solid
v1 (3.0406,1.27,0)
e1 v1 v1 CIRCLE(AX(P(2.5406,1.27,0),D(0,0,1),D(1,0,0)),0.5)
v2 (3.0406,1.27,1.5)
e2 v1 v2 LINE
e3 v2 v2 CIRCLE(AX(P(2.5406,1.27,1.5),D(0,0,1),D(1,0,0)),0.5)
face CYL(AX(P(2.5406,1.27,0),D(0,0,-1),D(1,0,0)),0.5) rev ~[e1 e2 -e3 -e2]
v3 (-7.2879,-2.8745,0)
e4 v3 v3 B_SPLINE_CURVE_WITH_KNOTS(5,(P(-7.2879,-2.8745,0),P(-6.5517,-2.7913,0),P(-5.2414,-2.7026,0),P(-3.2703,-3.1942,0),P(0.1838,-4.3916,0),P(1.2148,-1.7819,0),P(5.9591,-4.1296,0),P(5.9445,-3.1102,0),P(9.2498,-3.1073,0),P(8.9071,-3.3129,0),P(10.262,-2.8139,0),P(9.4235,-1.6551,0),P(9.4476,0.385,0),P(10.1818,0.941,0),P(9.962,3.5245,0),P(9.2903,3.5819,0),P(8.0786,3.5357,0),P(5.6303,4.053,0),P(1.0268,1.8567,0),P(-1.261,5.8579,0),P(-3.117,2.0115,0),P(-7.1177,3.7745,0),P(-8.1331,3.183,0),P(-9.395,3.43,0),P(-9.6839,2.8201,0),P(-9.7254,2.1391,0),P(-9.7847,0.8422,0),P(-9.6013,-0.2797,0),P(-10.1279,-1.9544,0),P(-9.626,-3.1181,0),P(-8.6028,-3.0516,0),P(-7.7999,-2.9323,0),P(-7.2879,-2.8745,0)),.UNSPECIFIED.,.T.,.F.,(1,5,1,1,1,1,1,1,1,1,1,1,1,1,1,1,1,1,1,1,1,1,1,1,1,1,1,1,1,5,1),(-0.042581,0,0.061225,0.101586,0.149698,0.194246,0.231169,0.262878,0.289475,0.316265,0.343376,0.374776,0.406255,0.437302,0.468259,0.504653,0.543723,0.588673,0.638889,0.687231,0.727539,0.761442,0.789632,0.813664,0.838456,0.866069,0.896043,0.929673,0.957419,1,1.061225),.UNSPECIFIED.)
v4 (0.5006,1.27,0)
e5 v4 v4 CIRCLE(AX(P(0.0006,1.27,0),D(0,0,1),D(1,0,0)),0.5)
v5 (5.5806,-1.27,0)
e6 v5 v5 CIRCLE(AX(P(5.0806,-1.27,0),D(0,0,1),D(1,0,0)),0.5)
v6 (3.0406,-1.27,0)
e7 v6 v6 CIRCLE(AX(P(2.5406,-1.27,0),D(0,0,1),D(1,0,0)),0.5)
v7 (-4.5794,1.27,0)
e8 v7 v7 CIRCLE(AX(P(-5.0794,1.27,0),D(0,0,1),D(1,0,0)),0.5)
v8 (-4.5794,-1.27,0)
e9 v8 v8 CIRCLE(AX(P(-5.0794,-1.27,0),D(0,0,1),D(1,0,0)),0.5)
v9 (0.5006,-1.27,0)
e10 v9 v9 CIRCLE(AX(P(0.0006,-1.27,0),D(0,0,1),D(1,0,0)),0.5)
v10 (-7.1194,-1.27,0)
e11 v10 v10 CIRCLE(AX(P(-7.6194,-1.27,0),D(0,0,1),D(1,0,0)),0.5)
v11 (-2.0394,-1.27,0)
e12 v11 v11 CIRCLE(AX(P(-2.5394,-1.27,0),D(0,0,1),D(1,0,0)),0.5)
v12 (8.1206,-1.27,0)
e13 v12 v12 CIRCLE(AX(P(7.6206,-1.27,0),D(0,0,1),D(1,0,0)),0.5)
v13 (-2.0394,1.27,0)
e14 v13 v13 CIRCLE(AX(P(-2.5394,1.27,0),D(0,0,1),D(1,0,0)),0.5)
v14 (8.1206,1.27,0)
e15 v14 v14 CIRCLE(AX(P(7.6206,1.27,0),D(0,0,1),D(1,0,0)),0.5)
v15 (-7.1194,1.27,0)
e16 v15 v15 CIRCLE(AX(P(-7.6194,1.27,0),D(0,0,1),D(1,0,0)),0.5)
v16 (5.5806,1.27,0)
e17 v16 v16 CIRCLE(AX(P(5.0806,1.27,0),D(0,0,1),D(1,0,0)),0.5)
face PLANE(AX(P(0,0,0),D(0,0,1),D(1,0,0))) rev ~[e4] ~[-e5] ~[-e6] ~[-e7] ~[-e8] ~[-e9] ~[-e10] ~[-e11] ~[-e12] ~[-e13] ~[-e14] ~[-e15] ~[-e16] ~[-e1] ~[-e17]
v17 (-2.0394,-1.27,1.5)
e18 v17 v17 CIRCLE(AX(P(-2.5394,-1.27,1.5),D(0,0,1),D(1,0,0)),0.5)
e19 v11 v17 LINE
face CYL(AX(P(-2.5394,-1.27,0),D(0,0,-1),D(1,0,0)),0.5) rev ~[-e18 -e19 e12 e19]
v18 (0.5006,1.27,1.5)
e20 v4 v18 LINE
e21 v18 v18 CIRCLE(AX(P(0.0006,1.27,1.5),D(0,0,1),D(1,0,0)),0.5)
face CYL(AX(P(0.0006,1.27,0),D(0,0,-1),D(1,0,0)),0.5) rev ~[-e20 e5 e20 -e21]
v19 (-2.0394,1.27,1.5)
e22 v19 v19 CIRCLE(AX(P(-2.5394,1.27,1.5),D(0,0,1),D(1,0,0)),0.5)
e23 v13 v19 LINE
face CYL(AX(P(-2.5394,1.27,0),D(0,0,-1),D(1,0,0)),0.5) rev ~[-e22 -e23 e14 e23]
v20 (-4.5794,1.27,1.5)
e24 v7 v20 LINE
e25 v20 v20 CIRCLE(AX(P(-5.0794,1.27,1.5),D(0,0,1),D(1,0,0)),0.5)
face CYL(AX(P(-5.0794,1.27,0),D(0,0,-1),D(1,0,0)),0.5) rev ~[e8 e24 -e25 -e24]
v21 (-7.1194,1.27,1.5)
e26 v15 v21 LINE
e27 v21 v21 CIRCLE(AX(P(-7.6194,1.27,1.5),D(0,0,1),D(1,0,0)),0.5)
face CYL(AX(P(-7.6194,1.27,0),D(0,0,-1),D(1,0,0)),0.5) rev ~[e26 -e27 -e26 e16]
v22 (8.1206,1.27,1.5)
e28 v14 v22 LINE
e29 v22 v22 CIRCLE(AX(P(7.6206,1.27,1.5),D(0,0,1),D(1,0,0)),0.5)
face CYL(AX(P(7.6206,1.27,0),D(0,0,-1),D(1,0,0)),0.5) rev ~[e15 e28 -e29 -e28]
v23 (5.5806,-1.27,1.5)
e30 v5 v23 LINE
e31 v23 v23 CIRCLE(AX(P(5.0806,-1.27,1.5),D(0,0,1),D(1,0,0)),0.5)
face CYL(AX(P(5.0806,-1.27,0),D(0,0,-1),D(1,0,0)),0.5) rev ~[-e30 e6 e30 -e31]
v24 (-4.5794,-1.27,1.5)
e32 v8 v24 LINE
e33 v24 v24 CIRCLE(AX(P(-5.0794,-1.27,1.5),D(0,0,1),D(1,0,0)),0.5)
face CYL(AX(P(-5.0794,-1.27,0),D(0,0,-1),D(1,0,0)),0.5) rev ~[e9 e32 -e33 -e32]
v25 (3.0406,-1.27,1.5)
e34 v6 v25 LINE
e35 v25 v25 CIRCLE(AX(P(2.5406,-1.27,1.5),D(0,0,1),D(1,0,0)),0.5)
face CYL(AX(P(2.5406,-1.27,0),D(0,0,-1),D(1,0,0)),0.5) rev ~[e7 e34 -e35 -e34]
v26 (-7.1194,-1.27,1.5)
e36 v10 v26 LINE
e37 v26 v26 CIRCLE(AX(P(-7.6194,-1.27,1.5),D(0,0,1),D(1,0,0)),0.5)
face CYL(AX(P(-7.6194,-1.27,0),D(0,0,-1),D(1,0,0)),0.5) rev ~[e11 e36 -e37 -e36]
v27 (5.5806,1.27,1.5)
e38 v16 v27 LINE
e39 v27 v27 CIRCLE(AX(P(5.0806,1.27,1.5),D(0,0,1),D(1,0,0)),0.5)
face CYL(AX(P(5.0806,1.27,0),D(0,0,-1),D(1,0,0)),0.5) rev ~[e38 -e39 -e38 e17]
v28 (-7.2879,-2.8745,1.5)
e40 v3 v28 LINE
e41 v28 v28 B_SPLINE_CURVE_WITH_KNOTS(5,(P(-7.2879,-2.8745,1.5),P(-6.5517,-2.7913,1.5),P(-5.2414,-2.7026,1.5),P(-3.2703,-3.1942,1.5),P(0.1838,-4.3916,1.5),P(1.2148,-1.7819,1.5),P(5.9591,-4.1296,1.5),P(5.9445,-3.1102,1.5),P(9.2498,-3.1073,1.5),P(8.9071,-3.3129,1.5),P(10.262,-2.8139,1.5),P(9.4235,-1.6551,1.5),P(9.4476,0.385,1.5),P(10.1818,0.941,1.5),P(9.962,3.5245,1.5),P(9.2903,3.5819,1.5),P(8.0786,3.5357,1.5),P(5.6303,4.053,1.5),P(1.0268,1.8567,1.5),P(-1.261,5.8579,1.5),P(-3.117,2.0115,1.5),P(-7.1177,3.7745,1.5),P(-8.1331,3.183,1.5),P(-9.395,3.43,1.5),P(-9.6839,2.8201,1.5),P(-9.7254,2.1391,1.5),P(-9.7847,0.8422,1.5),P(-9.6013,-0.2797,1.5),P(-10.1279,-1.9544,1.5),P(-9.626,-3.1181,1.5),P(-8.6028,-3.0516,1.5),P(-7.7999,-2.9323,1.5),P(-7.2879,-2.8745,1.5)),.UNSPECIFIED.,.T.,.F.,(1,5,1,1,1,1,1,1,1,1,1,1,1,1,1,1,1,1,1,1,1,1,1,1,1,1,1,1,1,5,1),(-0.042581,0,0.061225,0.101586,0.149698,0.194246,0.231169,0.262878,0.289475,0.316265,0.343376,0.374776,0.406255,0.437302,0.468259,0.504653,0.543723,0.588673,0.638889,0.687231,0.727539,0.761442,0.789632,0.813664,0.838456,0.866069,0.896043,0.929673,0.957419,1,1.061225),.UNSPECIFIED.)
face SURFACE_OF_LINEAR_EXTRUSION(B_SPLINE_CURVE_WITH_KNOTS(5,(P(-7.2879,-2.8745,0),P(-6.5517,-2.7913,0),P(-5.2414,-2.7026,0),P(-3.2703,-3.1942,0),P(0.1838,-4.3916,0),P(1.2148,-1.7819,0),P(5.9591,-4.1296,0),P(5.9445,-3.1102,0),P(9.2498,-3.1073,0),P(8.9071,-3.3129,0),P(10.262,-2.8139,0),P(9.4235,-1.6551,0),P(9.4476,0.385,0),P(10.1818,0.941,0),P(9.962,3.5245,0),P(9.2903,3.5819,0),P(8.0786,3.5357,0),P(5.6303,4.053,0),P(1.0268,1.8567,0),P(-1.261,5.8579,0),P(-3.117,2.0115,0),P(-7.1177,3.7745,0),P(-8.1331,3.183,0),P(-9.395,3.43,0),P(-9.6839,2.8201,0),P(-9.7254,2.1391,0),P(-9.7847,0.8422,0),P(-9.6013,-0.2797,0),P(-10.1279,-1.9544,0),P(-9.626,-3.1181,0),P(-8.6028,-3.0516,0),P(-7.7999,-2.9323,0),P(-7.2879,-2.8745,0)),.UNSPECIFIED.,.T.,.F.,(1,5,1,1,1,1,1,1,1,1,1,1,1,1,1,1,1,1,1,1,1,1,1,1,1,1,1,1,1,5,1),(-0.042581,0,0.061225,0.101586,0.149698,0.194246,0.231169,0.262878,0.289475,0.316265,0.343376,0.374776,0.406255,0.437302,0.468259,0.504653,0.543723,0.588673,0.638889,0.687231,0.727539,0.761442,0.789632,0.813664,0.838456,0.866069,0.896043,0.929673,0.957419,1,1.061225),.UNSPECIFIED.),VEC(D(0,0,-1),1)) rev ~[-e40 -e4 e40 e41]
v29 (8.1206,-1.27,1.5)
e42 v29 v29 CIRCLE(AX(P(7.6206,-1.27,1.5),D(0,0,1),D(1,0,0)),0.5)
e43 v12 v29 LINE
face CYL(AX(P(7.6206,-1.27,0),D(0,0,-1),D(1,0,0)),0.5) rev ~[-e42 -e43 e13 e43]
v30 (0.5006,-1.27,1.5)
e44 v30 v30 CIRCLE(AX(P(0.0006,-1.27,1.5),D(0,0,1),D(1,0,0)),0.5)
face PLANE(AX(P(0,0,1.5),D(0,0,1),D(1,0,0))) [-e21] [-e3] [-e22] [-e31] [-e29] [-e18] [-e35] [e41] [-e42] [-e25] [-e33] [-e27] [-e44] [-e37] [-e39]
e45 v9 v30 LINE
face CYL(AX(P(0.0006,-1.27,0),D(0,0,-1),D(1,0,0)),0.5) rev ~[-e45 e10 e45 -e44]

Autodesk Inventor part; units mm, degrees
ref_plane "YZ Plane" through (0, 0, 0) normal (1, 0, 0) x (0, 1, 0)
ref_plane "XZ Plane" through (0, 0, 0) normal (0, 1, 0) x (-1, 0, 0)
ref_plane "XY Plane" through (0, 0, 0) normal (0, 0, 1) x (1, 0, 0)
sketch "Эскиз1" plane through (0, 0, 0) normal (0, 0, 1) x (1, 0, 0)
  spline S0 degree 5 poles (-7.2879, -2.8745) (-6.5517, -2.7913) (-5.2414, -2.7026) (-3.2703, -3.1942) (0.1838, -4.3916) (1.2148, -1.7819) (5.9591, -4.1296) (5.9445, -3.1102) (9.2498, -3.1073) (8.9071, -3.3129) (10.262, -2.8139) (9.4235, -1.6551) (9.4476, 0.385) (10.1818, 0.941) (9.962, 3.5245) (9.2903, 3.5819) (8.0786, 3.5357) (5.6303, 4.053) (1.0268, 1.8567) (-1.261, 5.8579) (-3.117, 2.0115) (-7.1177, 3.7745) (-8.1331, 3.183) (-9.395, 3.43) (-9.6839, 2.8201) (-9.7254, 2.1391) (-9.7847, 0.8422) (-9.6013, -0.2797) (-10.1279, -1.9544) (-9.626, -3.1181) (-8.6028, -3.0516) (-7.7999, -2.9323) (-7.2879, -2.8745) knots 0 0 0 0 0 0 0.061225 0.101586 0.149698 0.194246 0.231169 0.262878 0.289475 0.316265 0.343376 0.374776 0.406255 0.437302 0.468259 0.504653 0.543723 0.588673 0.638889 0.687231 0.727539 0.761442 0.789632 0.813664 0.838456 0.866069 0.896043 0.929673 0.957419 1 1 1 1 1 1
  line L0 (-7.7526, -1.17) -> (-7.7526, -1.37) projected
  line L1 (-7.4863, -1.37) -> (-7.7526, -1.37) projected
  line L2 (-7.4863, -1.37) -> (-7.4863, -1.17) projected
  line L3 (-7.7526, -1.17) -> (-7.4863, -1.17) projected
  circle A0 centre (-7.6194, -1.27) radius 0.5
  line L4 (-7.6194, -1.37) -> (-7.6194, -1.17) construction
  line L5 (-7.7526, -1.27) -> (-7.4863, -1.27) construction
  circle A1 centre (-5.0794, -1.27) radius 0.5
  circle A2 centre (-2.5394, -1.27) radius 0.5
  circle A3 centre (0.0006, -1.27) radius 0.5
  circle A4 centre (2.5406, -1.27) radius 0.5
  circle A5 centre (5.0806, -1.27) radius 0.5
  circle A6 centre (7.6206, -1.27) radius 0.5
  circle A7 centre (-7.6194, 1.27) radius 0.5
  circle A8 centre (-5.0794, 1.27) radius 0.5
  circle A9 centre (-2.5394, 1.27) radius 0.5
  circle A10 centre (0.0006, 1.27) radius 0.5
  circle A11 centre (2.5406, 1.27) radius 0.5
  circle A12 centre (5.0806, 1.27) radius 0.5
  circle A13 centre (7.6206, 1.27) radius 0.5
  point P0 (0, 0)
  point P1 (-0.3454, -3.4271)
  point P2 (2.2796, -2.8745)
  point P3 (5.63, -3.4617)
  point P4 (7.5297, -3.1854)
  point P5 (8.9804, -3.1854)
  point P6 (9.2567, -3.1508)
  point P7 (9.6712, -2.8745)
  point P8 (9.7403, -2.011)
  point P9 (9.6021, 0)
  point P10 (9.982, 1.5466)
  point P11 (9.7403, 3.2045)
  point P12 (9.3258, 3.5154)
  point P13 (8.6004, 3.5845)
  point P14 (6.6317, 3.6536)
  point P15 (1.6579, 3.2391)
  point P16 (-1.3816, 4.0335)
  point P17 (-4.3866, 3.1355)
  point P18 (-7.5988, 3.3772)
  point P19 (-8.7386, 3.3082)
  point P20 (-9.3603, 3.17)
  point P21 (-9.6021, 2.8591)
  point P22 (-9.7057, 2.3065)
  point P23 (-9.7403, 1.2012)
  point P24 (-9.7403, -0.2495)
  point P25 (-9.8439, -1.9419)
  point P26 (-9.2567, -2.8745)
  dimension "d2" = 1
  dimension "d5" = 2.54
  dimension "d8" = 2.54
extrude "Выдавливание2" add sketch "Эскиз1" along normal blind 1.5 contours S0
properties part number "PBD-14 плата"
